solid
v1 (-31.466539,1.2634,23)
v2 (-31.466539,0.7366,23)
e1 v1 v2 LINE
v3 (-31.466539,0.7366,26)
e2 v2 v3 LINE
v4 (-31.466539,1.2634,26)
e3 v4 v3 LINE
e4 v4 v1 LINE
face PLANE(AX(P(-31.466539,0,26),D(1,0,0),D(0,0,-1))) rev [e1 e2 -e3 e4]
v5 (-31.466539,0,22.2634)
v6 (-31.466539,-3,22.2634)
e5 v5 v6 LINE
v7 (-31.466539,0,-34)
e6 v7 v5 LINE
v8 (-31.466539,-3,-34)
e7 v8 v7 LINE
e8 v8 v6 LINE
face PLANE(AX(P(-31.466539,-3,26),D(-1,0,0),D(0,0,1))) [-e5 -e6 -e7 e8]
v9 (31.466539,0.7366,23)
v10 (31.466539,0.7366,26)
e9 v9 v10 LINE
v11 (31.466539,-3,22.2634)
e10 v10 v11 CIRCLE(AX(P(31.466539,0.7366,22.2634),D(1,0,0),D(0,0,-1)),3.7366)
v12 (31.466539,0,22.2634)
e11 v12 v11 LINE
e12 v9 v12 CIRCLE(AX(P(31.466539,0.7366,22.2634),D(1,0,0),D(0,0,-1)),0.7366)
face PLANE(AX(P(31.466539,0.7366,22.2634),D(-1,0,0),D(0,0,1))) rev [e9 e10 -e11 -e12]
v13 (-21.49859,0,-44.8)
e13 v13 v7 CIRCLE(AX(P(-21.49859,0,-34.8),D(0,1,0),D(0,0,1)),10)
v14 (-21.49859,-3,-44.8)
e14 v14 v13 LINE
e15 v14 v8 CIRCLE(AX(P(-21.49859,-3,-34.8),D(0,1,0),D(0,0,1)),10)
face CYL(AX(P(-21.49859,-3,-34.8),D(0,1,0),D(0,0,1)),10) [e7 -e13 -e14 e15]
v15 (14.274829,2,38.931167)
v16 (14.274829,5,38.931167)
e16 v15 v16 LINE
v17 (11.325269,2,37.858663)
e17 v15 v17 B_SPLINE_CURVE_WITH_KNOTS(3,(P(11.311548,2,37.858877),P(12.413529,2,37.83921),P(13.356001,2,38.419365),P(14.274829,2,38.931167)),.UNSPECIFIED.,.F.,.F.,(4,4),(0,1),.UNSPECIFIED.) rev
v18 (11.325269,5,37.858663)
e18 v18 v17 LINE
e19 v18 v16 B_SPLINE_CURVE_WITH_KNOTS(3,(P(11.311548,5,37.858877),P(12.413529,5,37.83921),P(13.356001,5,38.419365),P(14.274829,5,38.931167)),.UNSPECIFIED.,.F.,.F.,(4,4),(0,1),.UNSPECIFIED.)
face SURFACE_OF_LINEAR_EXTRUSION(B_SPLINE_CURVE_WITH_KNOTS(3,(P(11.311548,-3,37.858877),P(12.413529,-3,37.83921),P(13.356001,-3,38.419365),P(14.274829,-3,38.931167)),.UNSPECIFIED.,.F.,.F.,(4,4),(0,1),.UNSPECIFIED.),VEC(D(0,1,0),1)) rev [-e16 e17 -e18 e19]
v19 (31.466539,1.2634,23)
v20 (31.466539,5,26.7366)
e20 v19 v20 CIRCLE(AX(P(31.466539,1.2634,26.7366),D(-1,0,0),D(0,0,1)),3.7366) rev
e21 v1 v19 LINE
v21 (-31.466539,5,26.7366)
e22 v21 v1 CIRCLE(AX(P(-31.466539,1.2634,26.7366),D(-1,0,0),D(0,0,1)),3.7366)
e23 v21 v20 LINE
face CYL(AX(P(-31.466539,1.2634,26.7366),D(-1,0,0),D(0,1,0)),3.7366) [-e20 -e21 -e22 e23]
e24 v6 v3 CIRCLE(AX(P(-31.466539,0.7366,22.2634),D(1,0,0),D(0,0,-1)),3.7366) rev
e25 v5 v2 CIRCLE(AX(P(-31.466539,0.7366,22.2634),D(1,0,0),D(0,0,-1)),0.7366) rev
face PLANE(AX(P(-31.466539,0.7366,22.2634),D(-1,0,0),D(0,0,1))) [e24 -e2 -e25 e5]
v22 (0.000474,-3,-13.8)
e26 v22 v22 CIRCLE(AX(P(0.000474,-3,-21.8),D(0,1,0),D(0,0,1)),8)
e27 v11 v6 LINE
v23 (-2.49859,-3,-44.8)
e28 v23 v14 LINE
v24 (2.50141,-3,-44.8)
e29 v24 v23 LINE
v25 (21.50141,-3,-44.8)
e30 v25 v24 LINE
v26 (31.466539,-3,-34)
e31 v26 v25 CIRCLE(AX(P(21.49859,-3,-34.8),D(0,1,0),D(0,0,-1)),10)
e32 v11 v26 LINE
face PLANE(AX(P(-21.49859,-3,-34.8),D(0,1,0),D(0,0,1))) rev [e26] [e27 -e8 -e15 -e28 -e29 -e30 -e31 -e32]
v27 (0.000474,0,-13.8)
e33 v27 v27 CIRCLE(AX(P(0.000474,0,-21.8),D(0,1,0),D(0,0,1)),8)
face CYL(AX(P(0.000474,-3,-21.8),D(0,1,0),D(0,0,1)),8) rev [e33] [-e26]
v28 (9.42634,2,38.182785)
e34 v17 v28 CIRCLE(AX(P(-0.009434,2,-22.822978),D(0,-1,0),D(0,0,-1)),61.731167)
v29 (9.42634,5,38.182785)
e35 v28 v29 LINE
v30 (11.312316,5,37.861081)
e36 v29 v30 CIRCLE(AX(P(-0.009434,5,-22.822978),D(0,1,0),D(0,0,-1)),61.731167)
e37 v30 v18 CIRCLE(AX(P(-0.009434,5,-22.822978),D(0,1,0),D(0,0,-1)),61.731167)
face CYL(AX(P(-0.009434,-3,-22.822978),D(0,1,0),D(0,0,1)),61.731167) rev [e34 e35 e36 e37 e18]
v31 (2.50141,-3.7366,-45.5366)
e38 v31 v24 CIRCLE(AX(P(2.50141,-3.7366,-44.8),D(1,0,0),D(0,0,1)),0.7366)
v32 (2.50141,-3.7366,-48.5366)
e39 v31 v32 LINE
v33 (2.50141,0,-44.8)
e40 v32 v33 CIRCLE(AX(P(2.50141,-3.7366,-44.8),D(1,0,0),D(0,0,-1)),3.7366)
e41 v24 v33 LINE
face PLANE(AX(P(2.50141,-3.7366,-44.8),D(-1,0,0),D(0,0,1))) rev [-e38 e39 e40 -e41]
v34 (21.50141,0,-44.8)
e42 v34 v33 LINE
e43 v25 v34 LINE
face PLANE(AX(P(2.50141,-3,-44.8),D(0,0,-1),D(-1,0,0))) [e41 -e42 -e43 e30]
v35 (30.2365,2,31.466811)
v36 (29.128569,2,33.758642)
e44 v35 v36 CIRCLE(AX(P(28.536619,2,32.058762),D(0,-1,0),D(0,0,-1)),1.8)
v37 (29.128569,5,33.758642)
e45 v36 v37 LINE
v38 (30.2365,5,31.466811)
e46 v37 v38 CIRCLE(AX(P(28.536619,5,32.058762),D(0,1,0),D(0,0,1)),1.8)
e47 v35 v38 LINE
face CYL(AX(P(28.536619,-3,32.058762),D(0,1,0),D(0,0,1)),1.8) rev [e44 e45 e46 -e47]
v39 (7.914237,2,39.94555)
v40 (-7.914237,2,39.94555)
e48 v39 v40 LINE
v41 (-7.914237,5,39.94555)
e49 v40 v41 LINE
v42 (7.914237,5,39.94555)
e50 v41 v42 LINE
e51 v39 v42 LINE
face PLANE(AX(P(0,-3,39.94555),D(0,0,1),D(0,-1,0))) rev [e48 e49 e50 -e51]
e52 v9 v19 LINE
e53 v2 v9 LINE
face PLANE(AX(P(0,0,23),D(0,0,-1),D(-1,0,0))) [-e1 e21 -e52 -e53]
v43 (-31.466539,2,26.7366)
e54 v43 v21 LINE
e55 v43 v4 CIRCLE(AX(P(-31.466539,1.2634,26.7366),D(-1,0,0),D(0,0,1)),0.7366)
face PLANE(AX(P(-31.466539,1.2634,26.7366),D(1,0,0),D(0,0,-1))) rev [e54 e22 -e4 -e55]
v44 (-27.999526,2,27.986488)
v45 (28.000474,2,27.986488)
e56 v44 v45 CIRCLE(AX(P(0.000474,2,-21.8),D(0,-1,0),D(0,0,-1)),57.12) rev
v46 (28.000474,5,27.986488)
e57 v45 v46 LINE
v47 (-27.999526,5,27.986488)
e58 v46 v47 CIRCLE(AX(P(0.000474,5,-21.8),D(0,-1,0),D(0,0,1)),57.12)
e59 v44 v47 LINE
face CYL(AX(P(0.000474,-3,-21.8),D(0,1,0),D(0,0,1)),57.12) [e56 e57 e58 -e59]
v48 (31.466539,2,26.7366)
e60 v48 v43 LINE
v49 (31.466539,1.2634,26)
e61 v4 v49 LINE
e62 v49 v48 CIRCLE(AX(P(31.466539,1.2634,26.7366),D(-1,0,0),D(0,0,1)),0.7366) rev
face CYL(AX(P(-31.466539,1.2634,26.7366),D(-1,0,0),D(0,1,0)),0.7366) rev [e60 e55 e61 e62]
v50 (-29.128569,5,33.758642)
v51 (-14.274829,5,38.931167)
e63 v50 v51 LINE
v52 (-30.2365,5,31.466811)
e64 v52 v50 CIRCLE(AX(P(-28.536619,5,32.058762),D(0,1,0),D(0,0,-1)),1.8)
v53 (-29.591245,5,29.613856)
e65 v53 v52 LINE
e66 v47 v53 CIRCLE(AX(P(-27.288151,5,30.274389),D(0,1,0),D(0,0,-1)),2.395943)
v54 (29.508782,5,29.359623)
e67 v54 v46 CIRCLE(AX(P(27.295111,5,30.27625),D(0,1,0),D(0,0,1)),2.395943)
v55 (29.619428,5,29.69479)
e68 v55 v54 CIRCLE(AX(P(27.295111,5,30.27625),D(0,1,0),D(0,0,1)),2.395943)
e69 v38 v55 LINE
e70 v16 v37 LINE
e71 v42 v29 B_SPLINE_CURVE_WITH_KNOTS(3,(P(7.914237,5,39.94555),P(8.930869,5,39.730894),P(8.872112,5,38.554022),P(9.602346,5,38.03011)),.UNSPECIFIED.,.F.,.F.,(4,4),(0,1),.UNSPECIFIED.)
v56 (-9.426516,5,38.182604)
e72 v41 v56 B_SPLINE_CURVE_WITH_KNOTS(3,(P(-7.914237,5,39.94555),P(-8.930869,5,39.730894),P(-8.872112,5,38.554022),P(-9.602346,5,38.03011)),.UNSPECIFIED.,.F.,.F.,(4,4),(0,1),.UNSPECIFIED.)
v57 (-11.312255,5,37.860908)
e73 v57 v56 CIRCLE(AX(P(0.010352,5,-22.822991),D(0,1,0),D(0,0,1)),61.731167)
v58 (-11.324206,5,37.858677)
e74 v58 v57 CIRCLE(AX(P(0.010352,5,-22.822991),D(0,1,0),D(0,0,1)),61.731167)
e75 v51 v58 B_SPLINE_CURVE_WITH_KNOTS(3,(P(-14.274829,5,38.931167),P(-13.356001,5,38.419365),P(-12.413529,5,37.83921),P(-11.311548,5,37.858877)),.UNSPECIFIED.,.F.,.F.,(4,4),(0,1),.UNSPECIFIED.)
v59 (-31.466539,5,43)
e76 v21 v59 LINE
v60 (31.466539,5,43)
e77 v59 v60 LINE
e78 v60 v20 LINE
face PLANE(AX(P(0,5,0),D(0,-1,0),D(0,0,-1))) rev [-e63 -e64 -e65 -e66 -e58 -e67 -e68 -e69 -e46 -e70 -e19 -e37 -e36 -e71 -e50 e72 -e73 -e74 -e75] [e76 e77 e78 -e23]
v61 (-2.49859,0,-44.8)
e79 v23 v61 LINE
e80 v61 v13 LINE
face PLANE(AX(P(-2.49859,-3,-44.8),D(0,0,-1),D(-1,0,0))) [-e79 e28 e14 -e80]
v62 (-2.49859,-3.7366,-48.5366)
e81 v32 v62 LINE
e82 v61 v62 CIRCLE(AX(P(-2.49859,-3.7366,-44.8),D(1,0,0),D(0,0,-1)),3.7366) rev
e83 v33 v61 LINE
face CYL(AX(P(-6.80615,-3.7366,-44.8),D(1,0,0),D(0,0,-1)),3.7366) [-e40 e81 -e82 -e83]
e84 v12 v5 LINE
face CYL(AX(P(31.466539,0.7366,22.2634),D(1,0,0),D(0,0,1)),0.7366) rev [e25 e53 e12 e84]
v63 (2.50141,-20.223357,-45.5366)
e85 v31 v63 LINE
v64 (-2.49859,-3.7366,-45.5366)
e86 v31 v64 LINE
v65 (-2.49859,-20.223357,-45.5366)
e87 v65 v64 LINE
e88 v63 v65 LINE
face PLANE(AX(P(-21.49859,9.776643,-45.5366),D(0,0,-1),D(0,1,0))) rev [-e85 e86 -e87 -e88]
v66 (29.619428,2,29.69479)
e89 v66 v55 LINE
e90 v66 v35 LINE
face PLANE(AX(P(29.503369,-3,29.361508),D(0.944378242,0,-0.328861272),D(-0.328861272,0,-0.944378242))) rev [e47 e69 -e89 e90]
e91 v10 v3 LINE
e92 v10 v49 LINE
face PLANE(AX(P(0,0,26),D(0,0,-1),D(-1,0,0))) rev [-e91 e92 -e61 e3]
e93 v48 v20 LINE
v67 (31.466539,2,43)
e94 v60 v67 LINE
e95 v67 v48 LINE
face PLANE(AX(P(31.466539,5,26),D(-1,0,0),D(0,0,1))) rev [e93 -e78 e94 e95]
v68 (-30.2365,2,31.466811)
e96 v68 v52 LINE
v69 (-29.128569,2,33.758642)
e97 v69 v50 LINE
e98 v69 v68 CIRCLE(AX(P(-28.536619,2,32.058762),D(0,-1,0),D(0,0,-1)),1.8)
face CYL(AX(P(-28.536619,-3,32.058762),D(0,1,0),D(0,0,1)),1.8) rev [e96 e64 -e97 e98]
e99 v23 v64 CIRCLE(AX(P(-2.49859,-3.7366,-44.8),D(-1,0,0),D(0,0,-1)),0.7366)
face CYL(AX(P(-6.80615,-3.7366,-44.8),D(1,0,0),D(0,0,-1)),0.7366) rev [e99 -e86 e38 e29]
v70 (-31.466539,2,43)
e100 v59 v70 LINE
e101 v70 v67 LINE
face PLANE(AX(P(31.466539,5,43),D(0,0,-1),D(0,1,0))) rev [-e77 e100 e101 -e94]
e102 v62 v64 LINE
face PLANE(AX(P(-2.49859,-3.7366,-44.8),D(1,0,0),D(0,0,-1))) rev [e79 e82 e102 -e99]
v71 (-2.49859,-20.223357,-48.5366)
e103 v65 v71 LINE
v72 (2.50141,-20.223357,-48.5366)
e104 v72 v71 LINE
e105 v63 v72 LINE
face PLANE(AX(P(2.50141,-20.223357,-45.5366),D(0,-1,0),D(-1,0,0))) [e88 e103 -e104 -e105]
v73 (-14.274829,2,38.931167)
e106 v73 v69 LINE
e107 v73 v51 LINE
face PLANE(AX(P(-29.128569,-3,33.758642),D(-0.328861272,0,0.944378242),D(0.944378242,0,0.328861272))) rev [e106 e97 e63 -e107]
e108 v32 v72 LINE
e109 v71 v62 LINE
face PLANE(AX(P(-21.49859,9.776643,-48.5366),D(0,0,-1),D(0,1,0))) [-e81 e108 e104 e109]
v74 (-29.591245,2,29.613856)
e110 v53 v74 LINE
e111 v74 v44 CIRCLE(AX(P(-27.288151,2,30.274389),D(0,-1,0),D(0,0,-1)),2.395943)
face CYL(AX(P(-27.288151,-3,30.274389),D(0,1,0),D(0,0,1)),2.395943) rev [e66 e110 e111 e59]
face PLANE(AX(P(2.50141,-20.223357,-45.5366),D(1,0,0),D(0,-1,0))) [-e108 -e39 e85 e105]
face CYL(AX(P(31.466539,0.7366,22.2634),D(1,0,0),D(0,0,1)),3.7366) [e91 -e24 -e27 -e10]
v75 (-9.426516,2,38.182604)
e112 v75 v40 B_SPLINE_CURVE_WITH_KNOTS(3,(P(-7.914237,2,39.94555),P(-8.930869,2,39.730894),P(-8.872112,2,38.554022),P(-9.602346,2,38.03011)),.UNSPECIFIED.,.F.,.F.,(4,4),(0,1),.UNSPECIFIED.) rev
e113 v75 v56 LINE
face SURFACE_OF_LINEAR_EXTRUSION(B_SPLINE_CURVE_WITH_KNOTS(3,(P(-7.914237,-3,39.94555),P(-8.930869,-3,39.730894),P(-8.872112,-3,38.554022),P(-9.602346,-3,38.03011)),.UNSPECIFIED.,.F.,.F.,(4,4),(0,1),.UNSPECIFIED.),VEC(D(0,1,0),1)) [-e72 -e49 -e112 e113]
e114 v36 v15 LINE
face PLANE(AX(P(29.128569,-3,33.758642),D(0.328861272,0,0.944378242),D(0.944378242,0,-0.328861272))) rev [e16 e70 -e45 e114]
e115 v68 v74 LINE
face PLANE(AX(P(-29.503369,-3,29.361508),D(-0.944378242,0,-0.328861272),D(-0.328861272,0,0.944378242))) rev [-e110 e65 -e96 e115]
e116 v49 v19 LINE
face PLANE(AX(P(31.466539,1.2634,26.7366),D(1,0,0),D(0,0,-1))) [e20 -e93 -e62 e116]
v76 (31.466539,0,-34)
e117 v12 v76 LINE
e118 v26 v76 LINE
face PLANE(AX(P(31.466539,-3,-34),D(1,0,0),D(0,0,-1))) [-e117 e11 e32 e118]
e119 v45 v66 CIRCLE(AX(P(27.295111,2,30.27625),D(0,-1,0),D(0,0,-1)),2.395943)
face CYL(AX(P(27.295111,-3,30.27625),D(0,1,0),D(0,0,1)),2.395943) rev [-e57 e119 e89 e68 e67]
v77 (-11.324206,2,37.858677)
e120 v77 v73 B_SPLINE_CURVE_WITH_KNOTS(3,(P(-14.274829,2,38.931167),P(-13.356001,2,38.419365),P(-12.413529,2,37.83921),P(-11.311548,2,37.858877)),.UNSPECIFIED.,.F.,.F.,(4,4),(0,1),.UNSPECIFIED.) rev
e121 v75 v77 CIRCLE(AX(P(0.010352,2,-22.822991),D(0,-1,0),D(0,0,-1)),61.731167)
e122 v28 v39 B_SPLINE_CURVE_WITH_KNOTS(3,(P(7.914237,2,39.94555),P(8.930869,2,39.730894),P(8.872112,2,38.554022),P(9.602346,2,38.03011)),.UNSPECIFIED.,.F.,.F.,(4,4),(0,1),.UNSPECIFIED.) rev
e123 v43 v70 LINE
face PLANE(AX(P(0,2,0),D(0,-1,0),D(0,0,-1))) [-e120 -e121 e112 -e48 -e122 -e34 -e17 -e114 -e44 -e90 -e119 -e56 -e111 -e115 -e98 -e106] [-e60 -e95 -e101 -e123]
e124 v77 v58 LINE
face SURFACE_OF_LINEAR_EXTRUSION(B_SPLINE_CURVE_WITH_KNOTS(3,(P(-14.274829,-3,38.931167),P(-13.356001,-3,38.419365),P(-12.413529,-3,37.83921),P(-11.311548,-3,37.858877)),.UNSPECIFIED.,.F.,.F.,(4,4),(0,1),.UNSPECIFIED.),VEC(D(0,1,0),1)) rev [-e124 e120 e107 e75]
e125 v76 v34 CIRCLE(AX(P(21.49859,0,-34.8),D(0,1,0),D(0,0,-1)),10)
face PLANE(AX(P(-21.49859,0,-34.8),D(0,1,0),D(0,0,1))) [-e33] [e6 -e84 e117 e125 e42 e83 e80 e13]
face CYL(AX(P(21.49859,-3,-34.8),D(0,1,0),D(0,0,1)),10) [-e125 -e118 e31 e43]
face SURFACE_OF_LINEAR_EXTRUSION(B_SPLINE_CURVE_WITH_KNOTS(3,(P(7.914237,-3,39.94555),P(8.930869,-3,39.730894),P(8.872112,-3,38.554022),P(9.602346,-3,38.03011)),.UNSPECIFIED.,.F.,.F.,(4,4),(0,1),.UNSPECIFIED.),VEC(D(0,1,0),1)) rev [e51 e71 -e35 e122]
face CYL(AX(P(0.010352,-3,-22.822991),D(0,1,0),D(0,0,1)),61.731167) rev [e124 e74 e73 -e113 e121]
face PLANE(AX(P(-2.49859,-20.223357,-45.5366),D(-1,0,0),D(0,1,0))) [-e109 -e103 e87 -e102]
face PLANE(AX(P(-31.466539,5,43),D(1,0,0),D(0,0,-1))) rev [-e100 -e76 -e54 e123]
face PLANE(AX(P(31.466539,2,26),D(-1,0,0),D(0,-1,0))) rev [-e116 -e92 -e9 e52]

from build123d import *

# Parameters (mm, degrees)
BASE_FLANGE1_DEPTH           = 3
SKETCH2_R                    = 8
CUT_EXTRUDE1_DEPTH           = 73.112420355
EDGE_FLANGE1_STRIP_W         = 13.4732
EDGE_FLANGE1_STRIP_H         = 3
EDGE_FLANGE1_STRIP_CUT_DEPTH = 62.933077126
EDGE_FLANGE1_DEPTH           = 62.933077126
EDGE_FLANGE2_STRIP_W         = 13.4732
EDGE_FLANGE2_STRIP_H         = 3
EDGE_FLANGE2_STRIP_CUT_DEPTH = 62.933077126
EDGE_FLANGE2_DEPTH           = 62.933077126
CUT_EXTRUDE14_DEPTH          = 73.492766325
CUT_EXTRUDE15_DEPTH          = 73.492766325
CUT_EXTRUDE16_DEPTH          = 73.492766325
SKETCHED_START               = -2.498589927
SKETCHED_BEND2_DEPTH         = 5
SKETCHED_BEND2_2_DEPTH       = 5


# Read off the part's stored shape, not the designer's step: Sketched Bend2
# Sheet-metal steps are written as plain solids
with BuildPart() as part:
    # Sketch1 → Base-Flange1 (new body)
    with BuildSketch(Plane(origin=(0, 0, 0), x_dir=(1, 0, 0), z_dir=(0, 1, 0))):
        with BuildLine():
            Line((2.501410073, 64.8), (-2.498589927, 64.8))
            Line((-2.498589927, 64.8), (-2.498589927, 44.8))
            Line((-2.498589927, 44.8), (-21.498589927, 44.8))
            ThreePointArc((-21.498589927, 44.8), (-28.847059156, 41.582329983), (-31.466538563, 34))
            Line((-31.466538563, 34), (-31.466538563, -26))
            Line((-31.466538563, -26), (31.466538563, -26))
            Line((31.466538563, -26), (31.466538563, 34))
            ThreePointArc((31.466538563, 34), (28.848015597, 41.581293991), (21.501410073, 44.8))
            Line((21.501410073, 44.8), (2.501410073, 44.8))
            Line((2.501410073, 44.8), (2.501410073, 64.8))
        make_face()
    extrude(amount=-BASE_FLANGE1_DEPTH)

    # Sketch2 → Cut-Extrude1 (cut, through all)
    with BuildSketch(Plane(origin=(0, 0, 0), x_dir=(1, 0, 0), z_dir=(0, 1, 0))):
        with Locations(Location((0.000474376, 21.8, 0), (0, 0, 270))):
            Circle(SKETCH2_R)
    extrude(amount=-CUT_EXTRUDE1_DEPTH, mode=Mode.SUBTRACT)

    # Edge-Flange1 strip (across the edge) → Edge-Flange1 strip cut (cut)
    with BuildSketch(Plane(origin=(-31.466538563, 0, 26), x_dir=(0, 0, -1), z_dir=(1, 0, 0))):
        with Locations((-3, -1.5)):
            Rectangle(EDGE_FLANGE1_STRIP_W, EDGE_FLANGE1_STRIP_H)
    extrude(amount=EDGE_FLANGE1_STRIP_CUT_DEPTH, mode=Mode.SUBTRACT)

    # Edge-Flange1 section (across the edge) → Edge-Flange1 (add)
    with BuildSketch(Plane(origin=(-31.466538563, 0, 26), x_dir=(0, 0, -1), z_dir=(1, 0, 0))):
        with BuildLine():
            Line((0, 0.7366), (0, 2))
            Line((0, 2), (3, 2))
            Line((3, 2), (3, 0.7366))
            ThreePointArc((3, 0.7366), (3.215745145, 0.215745145), (3.7366, 0))
            Line((3.7366, 0), (3.7366, -3))
            ThreePointArc((3.7366, -3), (1.094424801, -1.905575199), (0, 0.7366))
        make_face()
    extrude(amount=EDGE_FLANGE1_DEPTH)

    # Edge-Flange2 strip (across the edge) → Edge-Flange2 strip cut (cut)
    with BuildSketch(Plane(origin=(31.466538563, 2, 26), x_dir=(0, -1, 0), z_dir=(-1, 0, 0))):
        with Locations((-6, -1.5)):
            Rectangle(EDGE_FLANGE2_STRIP_W, EDGE_FLANGE2_STRIP_H)
    extrude(amount=EDGE_FLANGE2_STRIP_CUT_DEPTH, mode=Mode.SUBTRACT)

    # Edge-Flange2 section (across the edge) → Edge-Flange2 (add)
    with BuildSketch(Plane(origin=(31.466538563, 2, 26), x_dir=(0, -1, 0), z_dir=(-1, 0, 0))):
        with BuildLine():
            Line((-3, 0.7366), (-3, 17))
            Line((-3, 17), (0, 17))
            Line((0, 17), (0, 0.7366))
            ThreePointArc((0, 0.7366), (0.215745145, 0.215745145), (0.7366, 0))
            Line((0.7366, 0), (0.7366, -3))
            ThreePointArc((0.7366, -3), (-1.905575199, -1.905575199), (-3, 0.7366))
        make_face()
    extrude(amount=EDGE_FLANGE2_DEPTH)

    # Sketch10 → Cut-Extrude14 (cut, through all)
    with BuildSketch(Plane(origin=(0, 5, 0), x_dir=(1, 0, 0), z_dir=(0, 1, 0))):
        with BuildLine():
            ThreePointArc((-27.999525624, -27.986488127), (-14.471973254, -33.456154948), (0, -35.319999998))
            ThreePointArc((0, -35.319999998), (14.472463109, -33.456275138), (28.000474376, -27.986488127))
            ThreePointArc((28.000474376, -27.986488127), (29.507543106, -29.356635577), (29.415737967, -31.391367011))
            ThreePointArc((29.415737967, -31.391367011), (26.522239798, -32.891637528), (23.552482739, -34.23465141))
            ThreePointArc((23.552482739, -34.23465141), (12.025251123, -37.723725926), (0.039934977, -38.908169509))
            ThreePointArc((0.039934977, -38.908169509), (-11.98559581, -37.731400069), (-23.551533984, -34.234651411))
            ThreePointArc((-23.551533984, -34.234651411), (-26.516212861, -32.894099815), (-29.404911166, -31.396828455))
            ThreePointArc((-29.404911166, -31.396828455), (-29.503369191, -29.361507737), (-27.999525624, -27.986488127))
        make_face()
    extrude(amount=-CUT_EXTRUDE14_DEPTH, mode=Mode.SUBTRACT)

    # Sketch12 → Cut-Extrude15 (cut, through all)
    with BuildSketch(Plane(origin=(0, 5, 0), x_dir=(1, 0, 0), z_dir=(0, 1, 0))):
        with BuildLine():
            add(Edge.make_bspline(
                [(-7.914237019, -39.945550294), (-8.841345223, -39.749796487), (-8.874121397, -38.753829984), (-9.426515507, -38.182603627)],
                knots=[0, 0, 0, 0, 0.911940572, 0.911940572, 0.911940572, 0.911940572], degree=3))
            Line((-7.914237019, -39.945550294), (0, -39.945550294))
            Line((0, -39.945550294), (0, -38.908175729))
            ThreePointArc((0, -38.908175729), (-4.727168745, -38.726119033), (-9.426515507, -38.182603627))
        make_face()
        with BuildLine():
            add(Edge.make_bspline(
                [(-9.426515507, -38.182603627), (-9.479856164, -38.127444478), (-9.538041922, -38.076245756), (-9.602345878, -38.030110388)],
                knots=[0.911940572, 0.911940572, 0.911940572, 0.911940572, 1, 1, 1, 1], degree=3))
            ThreePointArc((-9.426515507, -38.182603627), (-4.727168745, -38.726119033), (0, -38.908175729))
            Line((0, -38.908175729), (0, -38.030110388))
            Line((0, -38.030110388), (-9.602345878, -38.030110388))
        make_face()
        with BuildLine():
            Line((0, -38.030110388), (0, -38.908175729))
            ThreePointArc((0, -38.908175729), (0.019967489, -38.908175848), (0.039934977, -38.908169509))
            ThreePointArc((0.039934977, -38.908169509), (4.746985688, -38.724674098), (9.42633967, -38.182785492))
            add(Edge.make_bspline(
                [(9.42633967, -38.182785492), (9.479728286, -38.127557013), (9.537971255, -38.076296456), (9.602345878, -38.030110388)],
                knots=[0.9118438, 0.9118438, 0.9118438, 0.9118438, 1, 1, 1, 1], degree=3))
            Line((9.602345878, -38.030110388), (0, -38.030110388))
        make_face()
        with BuildLine():
            Line((0, -38.908175729), (0, -39.945550294))
            Line((0, -39.945550294), (7.914237019, -39.945550294))
            add(Edge.make_bspline(
                [(7.914237019, -39.945550294), (8.841246841, -39.74981726), (8.874114431, -38.754041352), (9.42633967, -38.182785492)],
                knots=[0, 0, 0, 0, 0.9118438, 0.9118438, 0.9118438, 0.9118438], degree=3))
            ThreePointArc((9.42633967, -38.182785492), (4.746985688, -38.724674098), (0.039934977, -38.908169509))
            ThreePointArc((0.039934977, -38.908169509), (0.019967489, -38.908175848), (0, -38.908175729))
        make_face()
    extrude(amount=-CUT_EXTRUDE15_DEPTH, mode=Mode.SUBTRACT)

    # Sketch13 → Cut-Extrude16 (cut, through all)
    with BuildSketch(Plane(origin=(0, 5, 0), x_dir=(1, 0, 0), z_dir=(0, 1, 0))):
        with BuildLine():
            Line((-29.503369191, -29.361507737), (-30.236500006, -31.46681125))
            ThreePointArc((-30.236500006, -31.46681125), (-30.1571885, -32.842186741), (-29.128569459, -33.758642374))
            Line((-29.128569459, -33.758642374), (-14.274829355, -38.931167152))
            add(Edge.make_bspline(
                [(-14.274829355, -38.931167152), (-13.356001391, -38.419364556), (-12.413528872, -37.83920993), (-11.311548038, -37.858876708)],
                knots=[0, 0, 0, 0, 1, 1, 1, 1], degree=3))
            Line((-11.311548038, -37.858876708), (-10.639965658, -35.930319464))
            Line((-10.639965658, -35.930319464), (-29.503369191, -29.361507737))
        make_face()
        with BuildLine():
            Line((10.639965658, -35.930319464), (11.311548038, -37.858876708))
            add(Edge.make_bspline(
                [(14.274829355, -38.931167152), (13.356001391, -38.419364556), (12.413528872, -37.83920993), (11.311548038, -37.858876708)],
                knots=[0, 0, 0, 0, 1, 1, 1, 1], degree=3))
            Line((14.274829355, -38.931167152), (29.128569459, -33.758642374))
            ThreePointArc((29.128569459, -33.758642374), (30.1571885, -32.842186741), (30.236500006, -31.46681125))
            Line((30.236500006, -31.46681125), (29.503369191, -29.361507737))
            Line((29.503369191, -29.361507737), (10.639965658, -35.930319464))
        make_face()
    extrude(amount=-CUT_EXTRUDE16_DEPTH, mode=Mode.SUBTRACT)

    # Sketched Bend2 outline → Sketched Bend2 (cut)
    with BuildSketch(Plane.YZ.offset(SKETCHED_START)):
        with BuildLine():
            ThreePointArc((0, -44.8), (-0.845704021, -47.167467001), (-3, -48.463277222))
            Line((-3, -48.463277222), (-3, -64.8))
            Line((-3, -64.8), (0, -64.8))
            Line((0, -64.8), (0, -44.8))
        make_face()
    extrude(amount=SKETCHED_BEND2_DEPTH, mode=Mode.SUBTRACT)

    # Sketched Bend2 2 outline → Sketched Bend2 2 (add)
    with BuildSketch(Plane.YZ.offset(SKETCHED_START)):
        with BuildLine():
            ThreePointArc((-3, -44.8), (-3.215745145, -45.320854855), (-3.7366, -45.5366))
            Line((-3.7366, -45.5366), (-20.223356935, -45.5366))
            Line((-20.223356935, -45.5366), (-20.223356935, -48.5366))
            Line((-20.223356935, -48.5366), (-3.7366, -48.5366))
            ThreePointArc((-3.7366, -48.5366), (-3.36647982, -48.518224121), (-3, -48.463277222))
            Line((-3, -48.463277222), (-3, -44.8))
        make_face()
    extrude(amount=SKETCHED_BEND2_2_DEPTH)


solid = part.part
